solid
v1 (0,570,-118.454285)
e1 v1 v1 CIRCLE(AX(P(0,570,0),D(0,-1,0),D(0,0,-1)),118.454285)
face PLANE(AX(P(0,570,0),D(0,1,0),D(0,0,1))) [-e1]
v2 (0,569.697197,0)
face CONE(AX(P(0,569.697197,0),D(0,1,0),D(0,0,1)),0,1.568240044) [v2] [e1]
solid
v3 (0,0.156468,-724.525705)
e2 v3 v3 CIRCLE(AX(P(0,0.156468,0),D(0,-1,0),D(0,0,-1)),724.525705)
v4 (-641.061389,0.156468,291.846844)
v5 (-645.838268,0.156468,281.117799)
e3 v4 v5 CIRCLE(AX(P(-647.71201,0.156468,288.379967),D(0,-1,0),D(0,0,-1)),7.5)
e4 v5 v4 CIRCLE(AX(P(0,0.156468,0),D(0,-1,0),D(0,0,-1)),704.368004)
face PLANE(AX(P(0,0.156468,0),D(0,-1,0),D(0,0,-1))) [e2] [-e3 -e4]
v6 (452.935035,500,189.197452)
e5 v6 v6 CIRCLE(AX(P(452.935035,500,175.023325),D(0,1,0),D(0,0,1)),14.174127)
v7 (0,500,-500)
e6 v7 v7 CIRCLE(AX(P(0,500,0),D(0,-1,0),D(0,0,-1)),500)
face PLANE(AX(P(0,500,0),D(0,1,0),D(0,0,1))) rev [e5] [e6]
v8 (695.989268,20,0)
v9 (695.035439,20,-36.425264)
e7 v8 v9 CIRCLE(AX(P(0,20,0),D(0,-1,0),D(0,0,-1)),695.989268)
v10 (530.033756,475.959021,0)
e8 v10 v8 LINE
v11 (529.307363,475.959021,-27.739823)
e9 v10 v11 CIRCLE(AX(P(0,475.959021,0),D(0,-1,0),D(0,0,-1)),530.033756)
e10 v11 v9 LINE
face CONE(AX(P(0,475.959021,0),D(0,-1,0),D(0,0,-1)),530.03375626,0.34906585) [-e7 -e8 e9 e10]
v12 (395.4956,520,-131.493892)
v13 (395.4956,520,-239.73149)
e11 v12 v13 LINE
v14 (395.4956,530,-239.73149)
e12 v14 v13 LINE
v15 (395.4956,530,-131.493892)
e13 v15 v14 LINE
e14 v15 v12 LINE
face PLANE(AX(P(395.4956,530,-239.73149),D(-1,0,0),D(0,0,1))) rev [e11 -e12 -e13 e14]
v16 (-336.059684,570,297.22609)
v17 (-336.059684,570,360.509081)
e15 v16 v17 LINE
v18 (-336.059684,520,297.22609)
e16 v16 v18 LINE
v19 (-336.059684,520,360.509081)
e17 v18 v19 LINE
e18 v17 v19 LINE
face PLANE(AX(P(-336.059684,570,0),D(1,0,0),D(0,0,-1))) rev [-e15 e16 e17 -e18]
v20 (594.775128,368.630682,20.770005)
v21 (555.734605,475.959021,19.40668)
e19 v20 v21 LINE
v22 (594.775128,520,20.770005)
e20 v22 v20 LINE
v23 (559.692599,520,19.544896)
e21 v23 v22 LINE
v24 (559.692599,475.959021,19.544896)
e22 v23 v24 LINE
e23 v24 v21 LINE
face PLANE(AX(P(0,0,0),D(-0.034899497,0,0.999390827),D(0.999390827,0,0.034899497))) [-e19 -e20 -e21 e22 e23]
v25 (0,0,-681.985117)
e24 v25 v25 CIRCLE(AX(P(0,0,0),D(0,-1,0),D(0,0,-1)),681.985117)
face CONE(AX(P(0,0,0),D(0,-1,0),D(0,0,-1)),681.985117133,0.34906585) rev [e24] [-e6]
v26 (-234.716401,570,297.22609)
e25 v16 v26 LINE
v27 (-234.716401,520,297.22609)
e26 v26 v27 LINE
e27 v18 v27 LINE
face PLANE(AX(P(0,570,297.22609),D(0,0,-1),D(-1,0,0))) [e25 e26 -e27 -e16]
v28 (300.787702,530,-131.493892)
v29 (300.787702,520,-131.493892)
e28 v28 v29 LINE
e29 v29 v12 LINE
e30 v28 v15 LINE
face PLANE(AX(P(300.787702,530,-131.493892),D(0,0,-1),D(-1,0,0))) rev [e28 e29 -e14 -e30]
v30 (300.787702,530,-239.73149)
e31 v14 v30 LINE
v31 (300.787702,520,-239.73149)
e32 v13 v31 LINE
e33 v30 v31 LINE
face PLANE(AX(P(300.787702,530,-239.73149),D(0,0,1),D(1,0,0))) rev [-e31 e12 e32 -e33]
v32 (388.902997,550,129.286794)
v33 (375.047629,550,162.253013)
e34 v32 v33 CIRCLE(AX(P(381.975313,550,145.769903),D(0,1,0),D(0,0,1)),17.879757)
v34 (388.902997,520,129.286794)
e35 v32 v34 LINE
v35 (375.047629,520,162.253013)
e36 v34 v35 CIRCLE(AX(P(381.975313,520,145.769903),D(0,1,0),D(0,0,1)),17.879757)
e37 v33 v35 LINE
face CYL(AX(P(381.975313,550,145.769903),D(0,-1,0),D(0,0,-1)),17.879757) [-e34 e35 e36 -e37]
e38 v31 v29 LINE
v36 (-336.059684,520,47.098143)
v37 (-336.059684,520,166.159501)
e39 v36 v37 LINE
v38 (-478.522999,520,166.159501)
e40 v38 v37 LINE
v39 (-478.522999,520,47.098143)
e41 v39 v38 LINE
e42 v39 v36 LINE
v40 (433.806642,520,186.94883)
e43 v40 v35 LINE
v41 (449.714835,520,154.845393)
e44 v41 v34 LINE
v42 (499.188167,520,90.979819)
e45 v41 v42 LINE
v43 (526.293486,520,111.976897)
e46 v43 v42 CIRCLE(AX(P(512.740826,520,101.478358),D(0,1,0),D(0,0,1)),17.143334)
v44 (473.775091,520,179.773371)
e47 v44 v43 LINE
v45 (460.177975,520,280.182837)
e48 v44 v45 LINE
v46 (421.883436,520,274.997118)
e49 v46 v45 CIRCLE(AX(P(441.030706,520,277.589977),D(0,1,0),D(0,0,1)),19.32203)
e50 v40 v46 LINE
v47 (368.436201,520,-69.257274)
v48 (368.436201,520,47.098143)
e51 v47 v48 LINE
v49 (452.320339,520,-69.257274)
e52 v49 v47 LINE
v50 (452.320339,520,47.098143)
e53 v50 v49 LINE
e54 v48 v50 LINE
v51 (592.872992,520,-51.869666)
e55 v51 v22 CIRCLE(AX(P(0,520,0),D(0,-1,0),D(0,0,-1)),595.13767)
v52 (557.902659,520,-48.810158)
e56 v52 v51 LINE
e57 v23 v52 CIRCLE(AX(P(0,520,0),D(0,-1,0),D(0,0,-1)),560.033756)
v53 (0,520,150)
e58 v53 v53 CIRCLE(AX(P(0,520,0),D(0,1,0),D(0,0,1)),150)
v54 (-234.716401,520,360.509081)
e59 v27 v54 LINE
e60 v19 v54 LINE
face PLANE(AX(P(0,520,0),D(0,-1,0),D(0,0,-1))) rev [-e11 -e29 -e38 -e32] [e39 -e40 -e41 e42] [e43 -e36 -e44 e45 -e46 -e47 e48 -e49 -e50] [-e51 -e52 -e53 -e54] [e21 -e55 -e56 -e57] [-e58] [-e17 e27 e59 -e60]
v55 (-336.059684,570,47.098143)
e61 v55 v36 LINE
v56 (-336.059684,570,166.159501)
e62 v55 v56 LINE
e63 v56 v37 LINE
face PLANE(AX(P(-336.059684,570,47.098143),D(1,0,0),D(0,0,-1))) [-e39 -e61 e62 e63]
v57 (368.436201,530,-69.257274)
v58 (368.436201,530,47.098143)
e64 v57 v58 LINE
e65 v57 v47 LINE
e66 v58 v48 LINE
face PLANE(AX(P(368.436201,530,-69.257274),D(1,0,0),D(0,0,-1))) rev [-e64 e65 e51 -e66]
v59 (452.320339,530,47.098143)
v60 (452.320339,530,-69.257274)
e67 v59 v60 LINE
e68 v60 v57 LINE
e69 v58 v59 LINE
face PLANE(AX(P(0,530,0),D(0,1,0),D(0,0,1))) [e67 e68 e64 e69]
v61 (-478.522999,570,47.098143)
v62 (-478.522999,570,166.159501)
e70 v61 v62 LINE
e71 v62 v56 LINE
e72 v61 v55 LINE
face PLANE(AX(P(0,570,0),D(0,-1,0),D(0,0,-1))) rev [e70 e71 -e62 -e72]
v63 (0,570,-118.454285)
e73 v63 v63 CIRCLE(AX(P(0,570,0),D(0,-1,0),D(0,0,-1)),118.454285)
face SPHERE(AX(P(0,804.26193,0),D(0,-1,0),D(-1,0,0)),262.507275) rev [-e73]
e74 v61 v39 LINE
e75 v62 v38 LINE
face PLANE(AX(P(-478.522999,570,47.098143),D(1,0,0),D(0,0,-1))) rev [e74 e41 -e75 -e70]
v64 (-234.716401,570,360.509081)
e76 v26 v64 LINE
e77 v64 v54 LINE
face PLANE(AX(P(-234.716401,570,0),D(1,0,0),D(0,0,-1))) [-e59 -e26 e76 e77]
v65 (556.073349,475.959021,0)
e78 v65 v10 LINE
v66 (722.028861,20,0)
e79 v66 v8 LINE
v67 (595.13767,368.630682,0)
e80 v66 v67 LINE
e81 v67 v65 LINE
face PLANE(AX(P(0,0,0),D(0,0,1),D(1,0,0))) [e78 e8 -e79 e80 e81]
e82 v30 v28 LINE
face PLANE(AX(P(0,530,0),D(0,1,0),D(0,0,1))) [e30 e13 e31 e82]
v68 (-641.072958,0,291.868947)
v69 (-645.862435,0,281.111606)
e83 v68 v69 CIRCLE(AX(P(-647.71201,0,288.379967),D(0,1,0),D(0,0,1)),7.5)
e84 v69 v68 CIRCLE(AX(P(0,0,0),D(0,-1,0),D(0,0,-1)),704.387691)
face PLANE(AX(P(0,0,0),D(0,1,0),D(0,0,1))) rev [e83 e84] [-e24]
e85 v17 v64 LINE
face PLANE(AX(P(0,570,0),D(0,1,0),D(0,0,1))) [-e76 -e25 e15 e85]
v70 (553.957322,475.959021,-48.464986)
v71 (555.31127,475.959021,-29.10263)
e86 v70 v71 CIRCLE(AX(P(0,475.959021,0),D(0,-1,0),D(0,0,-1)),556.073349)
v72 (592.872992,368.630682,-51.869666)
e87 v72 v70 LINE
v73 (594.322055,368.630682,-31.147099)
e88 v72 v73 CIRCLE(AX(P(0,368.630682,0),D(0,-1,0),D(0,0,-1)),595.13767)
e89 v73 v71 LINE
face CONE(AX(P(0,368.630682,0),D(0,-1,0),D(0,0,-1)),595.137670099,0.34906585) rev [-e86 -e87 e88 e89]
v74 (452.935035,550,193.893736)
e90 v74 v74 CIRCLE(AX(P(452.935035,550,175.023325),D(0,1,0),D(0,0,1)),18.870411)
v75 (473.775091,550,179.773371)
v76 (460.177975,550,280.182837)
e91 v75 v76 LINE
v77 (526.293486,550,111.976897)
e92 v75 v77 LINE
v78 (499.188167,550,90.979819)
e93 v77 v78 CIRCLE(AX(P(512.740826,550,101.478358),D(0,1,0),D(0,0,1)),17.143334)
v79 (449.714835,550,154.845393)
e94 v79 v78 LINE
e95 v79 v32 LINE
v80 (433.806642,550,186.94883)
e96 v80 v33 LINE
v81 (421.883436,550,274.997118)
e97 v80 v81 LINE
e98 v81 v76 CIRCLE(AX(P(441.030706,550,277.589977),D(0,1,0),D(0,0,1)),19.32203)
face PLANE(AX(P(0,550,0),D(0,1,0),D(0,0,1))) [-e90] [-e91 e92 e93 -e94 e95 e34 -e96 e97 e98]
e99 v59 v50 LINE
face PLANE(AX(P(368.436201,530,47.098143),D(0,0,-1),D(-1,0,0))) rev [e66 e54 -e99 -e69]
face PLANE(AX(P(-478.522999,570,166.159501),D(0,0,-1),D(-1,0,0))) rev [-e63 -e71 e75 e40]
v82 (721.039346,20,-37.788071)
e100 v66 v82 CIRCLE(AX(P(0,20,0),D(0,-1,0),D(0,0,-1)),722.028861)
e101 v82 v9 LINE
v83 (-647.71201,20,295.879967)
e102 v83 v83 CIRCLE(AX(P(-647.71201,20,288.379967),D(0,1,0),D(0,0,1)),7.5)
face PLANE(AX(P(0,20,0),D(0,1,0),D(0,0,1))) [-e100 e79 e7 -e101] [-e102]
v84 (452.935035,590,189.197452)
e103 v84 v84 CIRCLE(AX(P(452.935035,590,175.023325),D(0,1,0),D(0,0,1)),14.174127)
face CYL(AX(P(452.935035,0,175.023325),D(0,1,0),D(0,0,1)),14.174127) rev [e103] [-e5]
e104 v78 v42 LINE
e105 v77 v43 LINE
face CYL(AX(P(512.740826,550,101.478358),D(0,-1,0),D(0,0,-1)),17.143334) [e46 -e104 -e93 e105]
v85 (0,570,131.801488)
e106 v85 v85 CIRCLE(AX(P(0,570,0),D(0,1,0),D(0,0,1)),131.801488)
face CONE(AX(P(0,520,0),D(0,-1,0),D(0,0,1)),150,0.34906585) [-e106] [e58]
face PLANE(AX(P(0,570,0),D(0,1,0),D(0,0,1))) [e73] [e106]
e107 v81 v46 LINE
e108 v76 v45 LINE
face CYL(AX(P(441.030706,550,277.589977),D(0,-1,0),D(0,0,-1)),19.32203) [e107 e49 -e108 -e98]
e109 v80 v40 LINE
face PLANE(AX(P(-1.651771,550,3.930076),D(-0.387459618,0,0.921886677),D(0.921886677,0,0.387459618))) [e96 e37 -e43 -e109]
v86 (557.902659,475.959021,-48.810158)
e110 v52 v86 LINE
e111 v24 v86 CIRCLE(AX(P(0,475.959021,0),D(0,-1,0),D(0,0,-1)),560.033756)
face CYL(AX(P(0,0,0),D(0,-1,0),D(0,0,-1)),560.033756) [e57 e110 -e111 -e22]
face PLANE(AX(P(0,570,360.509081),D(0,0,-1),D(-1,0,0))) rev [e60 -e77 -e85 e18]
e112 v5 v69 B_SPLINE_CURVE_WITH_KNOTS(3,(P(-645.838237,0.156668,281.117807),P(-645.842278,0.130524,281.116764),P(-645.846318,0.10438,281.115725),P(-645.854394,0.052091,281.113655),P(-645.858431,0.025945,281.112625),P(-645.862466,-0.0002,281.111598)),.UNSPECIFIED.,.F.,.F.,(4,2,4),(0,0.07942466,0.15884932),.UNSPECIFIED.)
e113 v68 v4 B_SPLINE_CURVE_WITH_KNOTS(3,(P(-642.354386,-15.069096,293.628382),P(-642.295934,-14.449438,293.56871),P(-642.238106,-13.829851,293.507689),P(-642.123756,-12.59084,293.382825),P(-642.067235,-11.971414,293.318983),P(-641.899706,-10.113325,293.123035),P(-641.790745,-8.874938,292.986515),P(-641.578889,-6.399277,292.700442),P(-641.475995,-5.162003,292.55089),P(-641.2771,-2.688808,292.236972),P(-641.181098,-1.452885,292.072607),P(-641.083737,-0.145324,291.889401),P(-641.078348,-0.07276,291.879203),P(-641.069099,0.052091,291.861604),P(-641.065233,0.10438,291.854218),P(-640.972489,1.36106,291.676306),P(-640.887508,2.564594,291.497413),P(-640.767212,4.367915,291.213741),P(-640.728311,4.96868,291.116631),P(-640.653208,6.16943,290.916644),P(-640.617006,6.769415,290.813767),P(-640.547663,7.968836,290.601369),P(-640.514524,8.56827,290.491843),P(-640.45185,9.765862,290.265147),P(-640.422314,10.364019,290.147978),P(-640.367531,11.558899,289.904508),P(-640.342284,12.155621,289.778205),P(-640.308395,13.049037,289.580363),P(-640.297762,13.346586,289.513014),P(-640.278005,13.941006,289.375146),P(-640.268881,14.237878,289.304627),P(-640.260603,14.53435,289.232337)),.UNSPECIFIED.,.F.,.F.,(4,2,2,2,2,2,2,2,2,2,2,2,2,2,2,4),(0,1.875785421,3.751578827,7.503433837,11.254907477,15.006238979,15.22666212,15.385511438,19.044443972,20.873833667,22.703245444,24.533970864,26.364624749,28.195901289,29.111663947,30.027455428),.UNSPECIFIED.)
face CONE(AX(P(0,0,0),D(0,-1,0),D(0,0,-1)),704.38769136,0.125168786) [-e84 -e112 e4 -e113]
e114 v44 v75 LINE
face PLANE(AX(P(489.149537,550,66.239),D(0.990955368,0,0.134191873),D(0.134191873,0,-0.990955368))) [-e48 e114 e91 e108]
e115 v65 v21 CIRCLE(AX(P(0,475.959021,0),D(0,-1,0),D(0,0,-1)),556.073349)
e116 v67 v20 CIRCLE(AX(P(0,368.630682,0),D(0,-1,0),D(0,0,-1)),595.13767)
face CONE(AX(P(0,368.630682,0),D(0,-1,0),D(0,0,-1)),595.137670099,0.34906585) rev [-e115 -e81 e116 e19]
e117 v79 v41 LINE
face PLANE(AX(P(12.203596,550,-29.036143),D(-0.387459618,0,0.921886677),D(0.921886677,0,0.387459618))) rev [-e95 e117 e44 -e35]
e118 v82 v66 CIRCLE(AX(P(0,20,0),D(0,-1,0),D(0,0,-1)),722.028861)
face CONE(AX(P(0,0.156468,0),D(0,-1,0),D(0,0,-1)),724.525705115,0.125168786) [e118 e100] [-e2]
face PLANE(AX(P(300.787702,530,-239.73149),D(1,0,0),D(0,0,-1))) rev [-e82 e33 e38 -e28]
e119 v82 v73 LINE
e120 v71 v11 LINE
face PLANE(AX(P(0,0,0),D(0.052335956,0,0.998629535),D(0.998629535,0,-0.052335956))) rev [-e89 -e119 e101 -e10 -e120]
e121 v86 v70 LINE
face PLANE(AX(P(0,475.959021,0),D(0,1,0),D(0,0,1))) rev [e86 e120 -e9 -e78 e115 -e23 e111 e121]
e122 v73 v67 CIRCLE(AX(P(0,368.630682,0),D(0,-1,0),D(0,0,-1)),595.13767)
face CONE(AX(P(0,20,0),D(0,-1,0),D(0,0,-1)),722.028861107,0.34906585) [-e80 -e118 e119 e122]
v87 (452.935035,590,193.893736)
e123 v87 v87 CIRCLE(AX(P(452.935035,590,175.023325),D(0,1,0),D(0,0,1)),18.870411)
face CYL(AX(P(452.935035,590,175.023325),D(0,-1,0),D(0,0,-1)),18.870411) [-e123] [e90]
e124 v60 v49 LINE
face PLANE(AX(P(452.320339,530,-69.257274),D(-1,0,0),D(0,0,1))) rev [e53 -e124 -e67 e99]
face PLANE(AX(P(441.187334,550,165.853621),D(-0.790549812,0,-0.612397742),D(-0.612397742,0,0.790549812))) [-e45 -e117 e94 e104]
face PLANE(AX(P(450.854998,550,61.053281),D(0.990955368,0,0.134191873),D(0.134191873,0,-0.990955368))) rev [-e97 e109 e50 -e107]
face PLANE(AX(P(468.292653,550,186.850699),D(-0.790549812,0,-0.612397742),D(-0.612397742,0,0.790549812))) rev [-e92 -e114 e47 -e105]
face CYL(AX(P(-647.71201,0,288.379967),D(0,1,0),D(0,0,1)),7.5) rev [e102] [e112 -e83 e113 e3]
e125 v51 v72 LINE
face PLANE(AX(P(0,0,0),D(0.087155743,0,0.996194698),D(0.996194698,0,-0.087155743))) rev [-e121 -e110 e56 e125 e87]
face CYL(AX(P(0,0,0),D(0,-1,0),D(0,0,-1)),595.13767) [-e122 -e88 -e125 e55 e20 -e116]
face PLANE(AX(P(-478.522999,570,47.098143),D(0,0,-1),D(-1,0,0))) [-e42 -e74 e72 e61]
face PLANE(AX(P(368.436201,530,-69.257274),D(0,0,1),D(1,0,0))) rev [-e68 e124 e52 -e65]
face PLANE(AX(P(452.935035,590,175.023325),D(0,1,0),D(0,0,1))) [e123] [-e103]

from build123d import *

# Parameters (mm, degrees)
REVOLVE_4_ANGLE           = 5
REVOLVE_4_OTHER_WAY_ANGLE = 2
CUT_EXTRUDE_1_DEPTH       = 1141.120605351
SKETCH_5_R                = 150
EXTRUDE_3_DEPTH           = 50
EXTRUDE_3_TAPER           = 20
SKETCH_9_W                = 101.343282943
SKETCH_9_H                = 63.282990441
SKETCH_9_W_2              = 142.463314855
SKETCH_9_H_2              = 119.061357177
EXTRUDE_5_DEPTH           = 50
SKETCH_9_3_W              = 101.343282943
SKETCH_9_3_H              = 63.282990441
SKETCH_9_3_W_2            = 142.463314855
SKETCH_9_3_H_2            = 119.061357177
SKETCH_9_3_W_3            = 94.707897755
SKETCH_9_3_H_3            = 108.237597434
SKETCH_9_3_W_4            = 83.884138011
SKETCH_9_3_H_4            = 116.355417242
EXTRUDE_6_DEPTH           = 10
EXTRUDE_10_DEPTH          = 30
SKETCH_11_R               = 18.870411167
EXTRUDE_11_DEPTH          = 40
CUT_EXTRUDE_2_DEPTH       = 40
CUT_EXTRUDE_2_DEPTH_BACK  = 1163.91658981
SKETCH_11_3_R             = 14.174126535


with BuildPart() as part:
    # 草图2 → 旋转2 (revolve)
    with BuildSketch(Plane.XY, mode=Mode.PRIVATE) as revolve_2_sk:
        Polygon((0, 520), (514.004150764, 520), (703.268672583, 0), (681.985117133, 0), (500, 500), (0, 500), align=None)
        Polygon((722.028861107, 20), (695.989267897, 20), (703.268672583, 0), (704.38769136, 0), (704.36800355, 0.156467804), (724.525705115, 0.156467804), align=None)
        with BuildLine():
            Line((560.03375626, 520), (514.004150764, 520))
            Line((514.004150764, 520), (522.853935072, 495.685417448))
            ThreePointArc((522.853935072, 495.685417448), (533.278359551, 508.108762772), (547.323148659, 500))
            Line((547.323148659, 500), (560.03375626, 520))
        make_face()
        Polygon((560.03375626, 475.959020857), (560.03375626, 520), (547.323148659, 500), (556.07334947, 475.959020857), align=None)
        with BuildLine():
            ThreePointArc((547.323148659, 500), (533.278359551, 508.108762772), (522.853935072, 495.685417448))
            Line((522.853935072, 495.685417448), (530.03375626, 475.959020857))
            Line((530.03375626, 475.959020857), (556.07334947, 475.959020857))
            Line((556.07334947, 475.959020857), (547.323148659, 500))
        make_face()
    revolve(revolve_2_sk.sketch.rotate(Axis((0, 0, 0), (0, 1, 0)), 90), axis=Axis((0, 0, 0), (0, 1, 0)))

    # 旋转3: read off the stored shape, not the designer's step
    # 旋转3: loft between two sections, ruled curve by curve
    revolve_3_from = [
        Edge.make_three_point_arc((555.311270271, 475.959020857, -29.102630486), (555.882797021, 475.959020857, -14.556303324), (556.07334947, 475.959020857, 0)),
        Edge.make_line((529.307363418, 475.959020857, -27.739823475), (555.311270271, 475.959020857, -29.102630486)),
        Edge.make_line((556.07334947, 475.959020857, 0), (530.03375626, 475.959020857, 0)),
        Edge.make_line((530.03375626, 475.959020857, 0), (529.307363418, 475.959020857, -27.739823475)),
    ]
    revolve_3_to = [
        Edge.make_three_point_arc((721.039345647, 20, -37.788070881), (721.78143985, 20, -18.900512174), (722.028861107, 20, 0)),
        Edge.make_line((695.035438794, 20, -36.42526387), (721.039345647, 20, -37.788070881)),
        Edge.make_line((722.028861107, 20, 0), (695.989267897, 20, 0)),
        Edge.make_line((695.989267897, 20, 0), (695.035438794, 20, -36.42526387)),
    ]
    revolve_3 = Solid(Shell([*[Face.make_surface_from_curves(revolve_3_from[k], revolve_3_to[k]) for k in range(4)], Face(Wire(revolve_3_from)), Face(Wire(revolve_3_to))]))
    add(revolve_3)

    # 草图2<11> → 旋转4 (revolve)
    with BuildSketch(Plane.XY):
        Polygon((595.137670099, 520), (560.03375626, 520), (560.03375626, 475.959020857), (556.07334947, 475.959020857), (595.137670099, 368.630682023), align=None)
    revolve(axis=Axis((0, 0, 0), (0, 1, 0)), revolution_arc=REVOLVE_4_ANGLE)

    # 草图2<11> → 旋转4 other way (revolve)
    with BuildSketch(Plane.XY):
        Polygon((595.137670099, 520), (560.03375626, 520), (560.03375626, 475.959020857), (556.07334947, 475.959020857), (595.137670099, 368.630682023), align=None)
    revolve(axis=Axis((0, 0, 0), (0, -1, 0)), revolution_arc=REVOLVE_4_OTHER_WAY_ANGLE)

    # 草图3 → 切除-拉伸1 (cut, through all)
    with BuildSketch(Plane(origin=(0, 20, 0), x_dir=(1, 0, 0), z_dir=(0, 1, 0))):
        with BuildLine():
            ThreePointArc((-649.025028468, -280.995795674), (-655.096181435, -289.69298497), (-646.398992139, -295.764137937))
            Line((-646.398992139, -295.764137937), (-649.025028468, -280.995795674))
        make_face()
        with BuildLine():
            Line((-649.025028468, -280.995795674), (-646.398992139, -295.764137937))
            ThreePointArc((-646.398992139, -295.764137937), (-641.963200156, -293.196727323), (-640.212010303, -288.379966806))
            ThreePointArc((-640.212010303, -288.379966806), (-642.895249786, -282.631156658), (-649.025028468, -280.995795674))
        make_face()
    extrude(amount=-CUT_EXTRUDE_1_DEPTH, mode=Mode.SUBTRACT)

    # 草图5 → 凸台-拉伸3 (add)
    with BuildSketch(Plane(origin=(0, 520, 0), x_dir=(1, 0, 0), z_dir=(0, 1, 0))):
        Circle(SKETCH_5_R)
    extrude(amount=EXTRUDE_3_DEPTH, taper=EXTRUDE_3_TAPER)

    # 切除-旋转4: read off the stored shape, not the designer's step
    # 切除-旋转4 outline → 切除-旋转4 (revolve, cut)
    with BuildSketch(Plane.XY):
        with BuildLine():
            Line((0, 570.0000001), (0, 541.754654672))
            ThreePointArc((0, 541.754654672), (60.887636923, 548.913608554), (118.45428562, 570.0000001))
            Line((118.45428562, 570.0000001), (0, 570.0000001))
        make_face()
    revolve(axis=Axis((0, 0, 0), (0, 1, 0)), mode=Mode.SUBTRACT)

    # 草图9 → 凸台-拉伸5 (add)
    with BuildSketch(Plane(origin=(0, 520, 0), x_dir=(1, 0, 0), z_dir=(0, 1, 0))):
        with Locations((-285.388042794, -328.86758542)):
            Rectangle(SKETCH_9_W, SKETCH_9_H)
        with Locations((-407.291341693, -106.628821994)):
            Rectangle(SKETCH_9_W_2, SKETCH_9_H_2)
    extrude(amount=EXTRUDE_5_DEPTH)

    # 草图9<3> → 凸台-拉伸6 (add)
    with BuildSketch(Plane(origin=(0, 520, 0), x_dir=(1, 0, 0), z_dir=(0, 1, 0))):
        with Locations((-285.388042794, -328.86758542)):
            Rectangle(SKETCH_9_3_W, SKETCH_9_3_H)
        with Locations((-407.291341693, -106.628821994)):
            Rectangle(SKETCH_9_3_W_2, SKETCH_9_3_H_2)
        with Locations((348.141651282, 185.612691078)):
            Rectangle(SKETCH_9_3_W_3, SKETCH_9_3_H_3)
        with Locations((410.378269806, 11.079565216)):
            Rectangle(SKETCH_9_3_W_4, SKETCH_9_3_H_4)
    extrude(amount=EXTRUDE_6_DEPTH)

    # 草图10 → 凸台-拉伸10 (add)
    with BuildSketch(Plane(origin=(0, 520, 0), x_dir=(1, 0, 0), z_dir=(0, 1, 0))):
        with BuildLine():
            Line((499.188166712, -90.979819427), (449.714835378, -154.845392603))
            Line((449.714835378, -154.845392603), (388.90299653, -129.286793666))
            ThreePointArc((388.90299653, -129.286793666), (365.492203191, -138.842219519), (375.047629043, -162.253012857))
            Line((375.047629043, -162.253012857), (433.806642006, -186.9488299))
            Line((433.806642006, -186.9488299), (421.883436355, -274.997117784))
            ThreePointArc((421.883436355, -274.997117784), (438.437846493, -296.73724676), (460.17797547, -280.182836622))
            Line((460.17797547, -280.182836622), (473.775090623, -179.773370873))
            Line((473.775090623, -179.773370873), (526.29348556, -111.976897408))
            ThreePointArc((526.29348556, -111.976897408), (523.239365127, -87.925698993), (499.188166712, -90.979819427))
        make_face()
    extrude(amount=EXTRUDE_10_DEPTH)

    # 草图11 → 凸台-拉伸11 (add)
    with BuildSketch(Plane(origin=(0, 550, 0), x_dir=(1, 0, 0), z_dir=(0, 1, 0))):
        with Locations(Location((452.935034731, -175.023325275, 0), (0, 0, 270))):
            Circle(SKETCH_11_R)
    extrude(amount=EXTRUDE_11_DEPTH)

    # 草图11<3> → 切除-拉伸2 (cut, two sides: drawn at the far end of the back side and taken through both)
    with BuildSketch(Plane(origin=(0, 550, 0), x_dir=(1, 0, 0), z_dir=(0, 1, 0)).offset(-CUT_EXTRUDE_2_DEPTH_BACK)):
        with Locations(Location((452.935034731, -175.023325275, 0), (0, 0, 270))):
            Circle(SKETCH_11_3_R)
    extrude(amount=CUT_EXTRUDE_2_DEPTH + CUT_EXTRUDE_2_DEPTH_BACK, mode=Mode.SUBTRACT)


with BuildPart() as body_2:
    # Cut-Revolve 4 2 outline → Cut-Revolve 4 2 (revolve)
    with BuildSketch(Plane.XY):
        Polygon((118.454285423, 570), (0, 570), (0, 569.697196729), align=None)
    revolve(axis=Axis((0, 0, 0), (0, 1, 0)))


solid = Compound([part.part, body_2.part])
